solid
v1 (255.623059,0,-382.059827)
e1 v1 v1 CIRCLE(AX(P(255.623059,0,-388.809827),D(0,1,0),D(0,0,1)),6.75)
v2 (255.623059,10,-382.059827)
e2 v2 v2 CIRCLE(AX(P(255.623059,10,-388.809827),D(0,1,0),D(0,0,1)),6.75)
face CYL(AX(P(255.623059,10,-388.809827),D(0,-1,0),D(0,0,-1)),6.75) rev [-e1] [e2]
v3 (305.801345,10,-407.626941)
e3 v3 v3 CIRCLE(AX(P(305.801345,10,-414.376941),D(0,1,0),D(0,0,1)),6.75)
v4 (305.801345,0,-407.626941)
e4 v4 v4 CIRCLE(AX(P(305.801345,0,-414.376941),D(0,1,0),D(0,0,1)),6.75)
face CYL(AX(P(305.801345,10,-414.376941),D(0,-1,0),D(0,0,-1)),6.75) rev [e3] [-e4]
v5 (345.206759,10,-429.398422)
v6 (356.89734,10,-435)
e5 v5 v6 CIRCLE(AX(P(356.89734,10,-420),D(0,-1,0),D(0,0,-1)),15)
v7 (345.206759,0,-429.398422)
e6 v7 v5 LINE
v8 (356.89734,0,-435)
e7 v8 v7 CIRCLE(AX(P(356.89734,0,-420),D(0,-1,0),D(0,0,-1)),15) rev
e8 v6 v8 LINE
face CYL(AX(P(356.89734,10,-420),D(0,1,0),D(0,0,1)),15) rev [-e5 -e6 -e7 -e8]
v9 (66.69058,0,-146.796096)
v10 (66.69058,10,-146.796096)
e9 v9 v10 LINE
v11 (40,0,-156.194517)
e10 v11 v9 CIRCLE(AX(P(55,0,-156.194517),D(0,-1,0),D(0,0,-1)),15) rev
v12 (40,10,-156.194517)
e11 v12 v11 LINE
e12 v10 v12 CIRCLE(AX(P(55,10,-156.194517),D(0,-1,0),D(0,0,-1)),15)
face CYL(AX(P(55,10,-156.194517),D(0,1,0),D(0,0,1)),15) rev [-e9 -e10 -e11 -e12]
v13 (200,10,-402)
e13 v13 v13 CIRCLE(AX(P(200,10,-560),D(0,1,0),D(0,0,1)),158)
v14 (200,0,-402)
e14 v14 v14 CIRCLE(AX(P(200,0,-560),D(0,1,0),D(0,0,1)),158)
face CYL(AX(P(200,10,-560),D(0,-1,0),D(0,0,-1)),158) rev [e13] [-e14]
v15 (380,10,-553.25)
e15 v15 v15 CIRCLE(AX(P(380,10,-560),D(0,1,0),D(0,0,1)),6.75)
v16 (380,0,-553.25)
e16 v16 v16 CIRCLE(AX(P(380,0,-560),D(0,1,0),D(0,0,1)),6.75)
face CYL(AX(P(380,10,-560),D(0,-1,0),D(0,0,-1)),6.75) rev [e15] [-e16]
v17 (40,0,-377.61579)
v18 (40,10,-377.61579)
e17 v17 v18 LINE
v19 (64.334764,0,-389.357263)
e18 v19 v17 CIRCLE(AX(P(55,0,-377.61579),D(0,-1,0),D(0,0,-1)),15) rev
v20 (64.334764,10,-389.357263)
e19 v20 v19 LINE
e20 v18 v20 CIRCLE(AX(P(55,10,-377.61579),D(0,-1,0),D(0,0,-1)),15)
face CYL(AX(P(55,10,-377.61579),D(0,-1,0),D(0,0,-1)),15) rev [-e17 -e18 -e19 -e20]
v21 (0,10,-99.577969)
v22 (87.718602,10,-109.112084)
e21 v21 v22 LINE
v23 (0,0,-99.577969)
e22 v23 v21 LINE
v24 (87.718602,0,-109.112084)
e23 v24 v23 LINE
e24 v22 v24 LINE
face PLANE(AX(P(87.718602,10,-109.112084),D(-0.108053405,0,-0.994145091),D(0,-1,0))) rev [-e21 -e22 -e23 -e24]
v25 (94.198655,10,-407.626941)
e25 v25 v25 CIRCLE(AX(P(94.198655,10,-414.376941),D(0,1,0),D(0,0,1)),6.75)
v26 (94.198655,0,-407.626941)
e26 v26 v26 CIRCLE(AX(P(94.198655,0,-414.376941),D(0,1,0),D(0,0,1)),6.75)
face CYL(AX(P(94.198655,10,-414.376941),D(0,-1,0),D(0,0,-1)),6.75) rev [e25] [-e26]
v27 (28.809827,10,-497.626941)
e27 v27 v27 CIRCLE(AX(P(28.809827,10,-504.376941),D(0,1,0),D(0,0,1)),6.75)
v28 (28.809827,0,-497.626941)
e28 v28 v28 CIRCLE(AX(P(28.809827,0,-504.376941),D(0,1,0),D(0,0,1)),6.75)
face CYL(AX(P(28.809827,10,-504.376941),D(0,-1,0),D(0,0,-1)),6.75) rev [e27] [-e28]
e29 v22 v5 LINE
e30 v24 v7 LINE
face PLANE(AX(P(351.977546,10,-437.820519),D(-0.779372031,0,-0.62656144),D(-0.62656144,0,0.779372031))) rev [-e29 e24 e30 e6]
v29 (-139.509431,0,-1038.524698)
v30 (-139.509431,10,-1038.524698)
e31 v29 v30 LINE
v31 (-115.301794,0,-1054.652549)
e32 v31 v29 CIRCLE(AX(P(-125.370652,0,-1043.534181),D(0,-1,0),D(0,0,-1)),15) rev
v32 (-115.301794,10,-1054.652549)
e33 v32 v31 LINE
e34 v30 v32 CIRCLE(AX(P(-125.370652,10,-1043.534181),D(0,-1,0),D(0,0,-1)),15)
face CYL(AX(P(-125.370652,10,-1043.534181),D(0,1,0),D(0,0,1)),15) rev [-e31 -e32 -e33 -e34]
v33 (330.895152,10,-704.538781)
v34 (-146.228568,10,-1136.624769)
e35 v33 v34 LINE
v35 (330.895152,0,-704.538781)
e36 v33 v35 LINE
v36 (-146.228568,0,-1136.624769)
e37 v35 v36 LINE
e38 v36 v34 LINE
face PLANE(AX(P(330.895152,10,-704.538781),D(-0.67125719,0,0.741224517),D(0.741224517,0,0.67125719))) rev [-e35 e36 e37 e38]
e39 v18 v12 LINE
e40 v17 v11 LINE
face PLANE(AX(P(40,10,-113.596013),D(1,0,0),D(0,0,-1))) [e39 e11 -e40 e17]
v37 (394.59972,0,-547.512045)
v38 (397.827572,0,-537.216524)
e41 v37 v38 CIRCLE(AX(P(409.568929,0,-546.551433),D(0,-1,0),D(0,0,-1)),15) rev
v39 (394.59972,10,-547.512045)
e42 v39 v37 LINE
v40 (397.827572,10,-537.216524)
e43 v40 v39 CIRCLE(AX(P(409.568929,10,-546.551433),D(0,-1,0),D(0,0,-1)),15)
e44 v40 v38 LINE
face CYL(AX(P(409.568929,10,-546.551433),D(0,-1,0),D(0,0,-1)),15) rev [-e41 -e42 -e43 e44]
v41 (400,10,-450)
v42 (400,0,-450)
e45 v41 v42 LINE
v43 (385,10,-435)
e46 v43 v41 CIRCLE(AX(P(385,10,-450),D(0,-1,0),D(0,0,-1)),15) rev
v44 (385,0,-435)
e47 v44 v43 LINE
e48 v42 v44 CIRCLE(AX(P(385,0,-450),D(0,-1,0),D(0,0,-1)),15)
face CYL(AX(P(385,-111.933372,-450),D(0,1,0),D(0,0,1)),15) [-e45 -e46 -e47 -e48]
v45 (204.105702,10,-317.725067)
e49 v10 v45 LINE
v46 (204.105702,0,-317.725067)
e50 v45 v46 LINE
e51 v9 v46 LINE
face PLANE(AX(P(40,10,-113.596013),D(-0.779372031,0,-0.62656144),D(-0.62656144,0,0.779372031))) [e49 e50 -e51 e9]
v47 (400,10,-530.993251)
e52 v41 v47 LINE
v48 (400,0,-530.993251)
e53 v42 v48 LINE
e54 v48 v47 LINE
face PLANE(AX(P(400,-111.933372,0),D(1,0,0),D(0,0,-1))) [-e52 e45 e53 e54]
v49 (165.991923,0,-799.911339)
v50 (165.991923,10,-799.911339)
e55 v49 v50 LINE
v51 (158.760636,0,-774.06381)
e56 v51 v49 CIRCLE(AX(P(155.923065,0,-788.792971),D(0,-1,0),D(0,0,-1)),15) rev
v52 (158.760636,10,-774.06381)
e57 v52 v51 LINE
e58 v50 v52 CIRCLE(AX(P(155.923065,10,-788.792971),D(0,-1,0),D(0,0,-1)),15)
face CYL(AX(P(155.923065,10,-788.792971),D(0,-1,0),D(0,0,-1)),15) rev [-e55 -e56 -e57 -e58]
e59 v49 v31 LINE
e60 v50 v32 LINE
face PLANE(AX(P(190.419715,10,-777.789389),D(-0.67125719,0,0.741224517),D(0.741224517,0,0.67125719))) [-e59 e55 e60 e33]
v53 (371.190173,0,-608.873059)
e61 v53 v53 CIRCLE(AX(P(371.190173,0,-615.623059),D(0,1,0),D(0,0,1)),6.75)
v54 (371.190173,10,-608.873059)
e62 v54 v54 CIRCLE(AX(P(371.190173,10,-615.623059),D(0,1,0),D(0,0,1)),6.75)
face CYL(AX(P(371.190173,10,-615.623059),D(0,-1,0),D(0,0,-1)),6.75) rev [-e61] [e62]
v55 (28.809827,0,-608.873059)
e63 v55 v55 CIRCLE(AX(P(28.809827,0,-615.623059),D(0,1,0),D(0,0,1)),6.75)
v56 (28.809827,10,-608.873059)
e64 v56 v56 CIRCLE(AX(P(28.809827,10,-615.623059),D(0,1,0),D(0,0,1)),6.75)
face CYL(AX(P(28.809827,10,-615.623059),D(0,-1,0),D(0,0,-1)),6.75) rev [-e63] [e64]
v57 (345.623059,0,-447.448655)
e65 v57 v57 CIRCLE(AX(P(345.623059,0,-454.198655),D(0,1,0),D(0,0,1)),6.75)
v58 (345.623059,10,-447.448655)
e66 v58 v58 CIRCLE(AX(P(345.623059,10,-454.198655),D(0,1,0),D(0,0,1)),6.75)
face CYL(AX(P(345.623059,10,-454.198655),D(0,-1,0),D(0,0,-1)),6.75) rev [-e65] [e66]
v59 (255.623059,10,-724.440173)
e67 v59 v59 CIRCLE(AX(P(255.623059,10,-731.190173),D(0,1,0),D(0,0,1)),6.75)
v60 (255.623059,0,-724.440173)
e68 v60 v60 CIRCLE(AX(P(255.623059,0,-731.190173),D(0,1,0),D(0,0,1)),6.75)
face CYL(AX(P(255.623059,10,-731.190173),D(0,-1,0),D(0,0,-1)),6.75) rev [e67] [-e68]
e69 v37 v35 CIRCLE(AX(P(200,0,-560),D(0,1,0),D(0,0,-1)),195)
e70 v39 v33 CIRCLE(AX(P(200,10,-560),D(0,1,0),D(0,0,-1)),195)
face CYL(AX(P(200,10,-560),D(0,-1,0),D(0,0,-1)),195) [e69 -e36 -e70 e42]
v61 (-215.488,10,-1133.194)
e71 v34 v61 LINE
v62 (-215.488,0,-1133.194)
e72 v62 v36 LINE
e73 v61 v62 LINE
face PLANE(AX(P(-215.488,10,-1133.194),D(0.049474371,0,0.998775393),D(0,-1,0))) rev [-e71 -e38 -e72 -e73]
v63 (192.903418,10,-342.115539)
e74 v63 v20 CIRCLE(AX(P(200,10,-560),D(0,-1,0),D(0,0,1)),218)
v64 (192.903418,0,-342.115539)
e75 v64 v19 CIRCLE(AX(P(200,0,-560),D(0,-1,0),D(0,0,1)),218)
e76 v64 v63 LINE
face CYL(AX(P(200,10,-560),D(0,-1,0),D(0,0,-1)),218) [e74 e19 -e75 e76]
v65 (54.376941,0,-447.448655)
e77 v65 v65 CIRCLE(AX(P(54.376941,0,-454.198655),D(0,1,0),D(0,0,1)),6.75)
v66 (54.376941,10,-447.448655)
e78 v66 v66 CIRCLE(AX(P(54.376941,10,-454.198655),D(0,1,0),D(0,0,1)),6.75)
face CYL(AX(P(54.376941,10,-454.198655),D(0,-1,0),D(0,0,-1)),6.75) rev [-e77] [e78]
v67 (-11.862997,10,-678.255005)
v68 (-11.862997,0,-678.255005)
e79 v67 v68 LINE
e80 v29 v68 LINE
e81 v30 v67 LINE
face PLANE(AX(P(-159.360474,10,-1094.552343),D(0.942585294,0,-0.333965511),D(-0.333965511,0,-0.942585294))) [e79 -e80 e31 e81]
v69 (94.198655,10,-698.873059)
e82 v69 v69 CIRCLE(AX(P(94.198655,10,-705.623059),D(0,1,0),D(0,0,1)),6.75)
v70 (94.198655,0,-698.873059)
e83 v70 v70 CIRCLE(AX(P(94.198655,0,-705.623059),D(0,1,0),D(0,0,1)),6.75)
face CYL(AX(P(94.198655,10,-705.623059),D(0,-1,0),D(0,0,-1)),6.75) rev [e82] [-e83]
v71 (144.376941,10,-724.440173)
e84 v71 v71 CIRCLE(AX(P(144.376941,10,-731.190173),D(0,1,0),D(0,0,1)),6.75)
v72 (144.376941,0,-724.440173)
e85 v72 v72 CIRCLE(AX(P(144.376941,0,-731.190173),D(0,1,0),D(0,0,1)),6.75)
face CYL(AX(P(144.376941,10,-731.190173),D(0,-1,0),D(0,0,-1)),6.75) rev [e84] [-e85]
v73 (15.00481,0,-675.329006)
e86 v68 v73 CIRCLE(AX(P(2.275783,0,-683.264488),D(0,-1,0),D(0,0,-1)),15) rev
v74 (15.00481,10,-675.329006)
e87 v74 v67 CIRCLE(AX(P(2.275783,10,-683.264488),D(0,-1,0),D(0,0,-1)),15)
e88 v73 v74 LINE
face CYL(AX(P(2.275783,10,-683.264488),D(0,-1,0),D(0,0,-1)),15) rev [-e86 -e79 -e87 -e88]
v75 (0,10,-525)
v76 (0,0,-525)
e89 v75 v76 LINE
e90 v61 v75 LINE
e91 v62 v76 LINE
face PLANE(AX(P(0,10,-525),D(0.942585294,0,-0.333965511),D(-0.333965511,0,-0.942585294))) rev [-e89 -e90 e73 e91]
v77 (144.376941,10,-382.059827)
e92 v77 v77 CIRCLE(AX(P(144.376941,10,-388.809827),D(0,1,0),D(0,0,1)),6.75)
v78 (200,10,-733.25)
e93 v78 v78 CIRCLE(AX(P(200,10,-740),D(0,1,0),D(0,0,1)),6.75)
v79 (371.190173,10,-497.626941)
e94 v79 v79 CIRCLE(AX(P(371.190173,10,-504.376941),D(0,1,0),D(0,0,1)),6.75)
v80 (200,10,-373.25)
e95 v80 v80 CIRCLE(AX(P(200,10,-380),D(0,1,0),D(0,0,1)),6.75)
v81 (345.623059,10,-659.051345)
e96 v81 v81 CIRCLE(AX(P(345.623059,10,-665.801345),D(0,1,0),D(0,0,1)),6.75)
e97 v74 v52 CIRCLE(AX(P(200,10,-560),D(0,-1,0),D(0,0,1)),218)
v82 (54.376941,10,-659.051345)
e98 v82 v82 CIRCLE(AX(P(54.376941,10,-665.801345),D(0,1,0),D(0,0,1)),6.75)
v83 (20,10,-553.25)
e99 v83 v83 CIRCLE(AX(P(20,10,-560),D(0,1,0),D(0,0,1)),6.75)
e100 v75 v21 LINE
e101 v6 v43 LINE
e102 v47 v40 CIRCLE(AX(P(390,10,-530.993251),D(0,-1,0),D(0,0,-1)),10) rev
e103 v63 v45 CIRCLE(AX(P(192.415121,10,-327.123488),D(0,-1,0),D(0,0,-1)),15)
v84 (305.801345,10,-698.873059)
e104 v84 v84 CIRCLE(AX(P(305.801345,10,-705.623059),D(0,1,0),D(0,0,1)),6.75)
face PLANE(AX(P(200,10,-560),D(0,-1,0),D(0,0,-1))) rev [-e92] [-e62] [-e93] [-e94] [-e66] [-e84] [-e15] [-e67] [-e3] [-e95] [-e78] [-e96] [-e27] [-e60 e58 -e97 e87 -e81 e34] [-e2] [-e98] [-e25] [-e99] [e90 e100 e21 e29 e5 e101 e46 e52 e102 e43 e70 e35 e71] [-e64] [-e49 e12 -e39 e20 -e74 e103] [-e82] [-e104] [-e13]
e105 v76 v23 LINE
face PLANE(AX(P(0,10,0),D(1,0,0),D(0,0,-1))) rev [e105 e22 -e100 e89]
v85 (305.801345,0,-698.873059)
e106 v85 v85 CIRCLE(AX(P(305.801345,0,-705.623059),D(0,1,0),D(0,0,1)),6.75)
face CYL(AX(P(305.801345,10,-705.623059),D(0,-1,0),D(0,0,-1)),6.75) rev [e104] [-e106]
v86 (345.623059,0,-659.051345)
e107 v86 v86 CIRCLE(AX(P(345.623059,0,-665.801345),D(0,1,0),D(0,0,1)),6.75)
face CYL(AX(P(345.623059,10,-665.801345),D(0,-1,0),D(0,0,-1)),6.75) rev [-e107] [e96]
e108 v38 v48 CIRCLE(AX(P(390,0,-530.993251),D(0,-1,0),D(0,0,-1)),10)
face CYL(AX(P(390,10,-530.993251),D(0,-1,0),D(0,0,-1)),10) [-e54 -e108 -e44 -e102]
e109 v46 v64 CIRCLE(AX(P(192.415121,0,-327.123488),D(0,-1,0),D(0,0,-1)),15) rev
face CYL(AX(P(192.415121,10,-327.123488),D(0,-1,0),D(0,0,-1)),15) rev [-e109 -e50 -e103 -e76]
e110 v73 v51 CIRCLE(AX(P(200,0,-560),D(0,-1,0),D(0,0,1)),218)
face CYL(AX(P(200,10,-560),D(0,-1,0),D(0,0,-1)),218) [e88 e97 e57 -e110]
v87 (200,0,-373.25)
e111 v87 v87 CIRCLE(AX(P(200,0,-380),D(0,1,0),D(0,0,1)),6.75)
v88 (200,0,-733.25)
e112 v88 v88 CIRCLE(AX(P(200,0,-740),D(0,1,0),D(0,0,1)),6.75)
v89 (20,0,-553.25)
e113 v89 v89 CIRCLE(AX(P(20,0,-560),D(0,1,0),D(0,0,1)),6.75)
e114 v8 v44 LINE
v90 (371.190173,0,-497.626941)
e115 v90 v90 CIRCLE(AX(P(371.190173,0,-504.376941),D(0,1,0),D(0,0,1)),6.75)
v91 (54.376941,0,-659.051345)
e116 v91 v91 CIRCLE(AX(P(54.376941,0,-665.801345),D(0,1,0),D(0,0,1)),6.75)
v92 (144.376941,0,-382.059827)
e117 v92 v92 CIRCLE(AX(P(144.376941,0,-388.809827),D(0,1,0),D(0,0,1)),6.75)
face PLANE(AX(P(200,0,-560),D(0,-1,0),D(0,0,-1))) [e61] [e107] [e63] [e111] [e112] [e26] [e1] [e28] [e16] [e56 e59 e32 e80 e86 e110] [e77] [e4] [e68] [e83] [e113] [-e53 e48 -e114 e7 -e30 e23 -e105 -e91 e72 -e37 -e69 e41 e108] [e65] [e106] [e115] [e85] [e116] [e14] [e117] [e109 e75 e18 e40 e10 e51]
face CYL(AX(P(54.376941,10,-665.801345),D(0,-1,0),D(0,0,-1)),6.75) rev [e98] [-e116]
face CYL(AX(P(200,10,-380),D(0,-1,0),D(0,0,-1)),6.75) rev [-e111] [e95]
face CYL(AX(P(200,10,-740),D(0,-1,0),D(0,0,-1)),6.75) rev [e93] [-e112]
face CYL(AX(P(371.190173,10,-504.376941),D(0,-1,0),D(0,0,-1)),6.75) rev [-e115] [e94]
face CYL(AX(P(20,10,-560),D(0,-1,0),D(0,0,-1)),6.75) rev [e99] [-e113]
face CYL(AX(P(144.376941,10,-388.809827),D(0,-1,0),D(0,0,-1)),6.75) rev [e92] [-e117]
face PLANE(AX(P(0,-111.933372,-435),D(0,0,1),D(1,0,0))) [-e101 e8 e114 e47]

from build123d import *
from OCP.BRepFilletAPI import BRepFilletAPI_MakeChamfer

# Parameters (mm, degrees)
ESQUISSE2_R        = 6.75
ESQUISSE2_R_2      = 158
BOSS_EXTRU_1_DEPTH = 10
BOSS_EXTRU_2_DEPTH = 10
CONG_1_R           = 15
CHANFREIN1_SIZE    = 140
CHANFREIN1_SIZE2   = 99.577969333
CHANFREIN1_SIZE2_2 = 103.340011173
CONG_2_R           = 10


with BuildPart() as part:
    # Esquisse2 → Boss.-Extru.1 (new body)
    with BuildSketch(Plane(origin=(0, 0, 0), x_dir=(1, 0, 0), z_dir=(0, 1, 0))):
        with BuildLine():
            Line((0, 0), (0, 525))
            Line((0, 525), (-250, 1230.600775194))
            Line((-250, 1230.600775194), (330.895152108, 704.538780798))
            ThreePointArc((330.895152108, 704.538780798), (394.393669115, 575.365591696), (351.977546011, 437.820519282))
            Line((351.977546011, 437.820519282), (0, 0))
        make_face()
        with Locations(Location((200, 380, 0), (0, 0, 270))):
            Circle(ESQUISSE2_R, mode=Mode.SUBTRACT)
        with Locations(Location((144.376941013, 388.809827067, 0), (0, 0, 270))):
            Circle(ESQUISSE2_R, mode=Mode.SUBTRACT)
        with Locations(Location((94.198654587, 414.376941013, 0), (0, 0, 270))):
            Circle(ESQUISSE2_R, mode=Mode.SUBTRACT)
        with Locations(Location((54.376941013, 454.198654587, 0), (0, 0, 270))):
            Circle(ESQUISSE2_R, mode=Mode.SUBTRACT)
        with Locations(Location((28.809827067, 504.376941013, 0), (0, 0, 270))):
            Circle(ESQUISSE2_R, mode=Mode.SUBTRACT)
        with Locations(Location((20, 560, 0), (0, 0, 270))):
            Circle(ESQUISSE2_R, mode=Mode.SUBTRACT)
        with Locations(Location((28.809827067, 615.623058987, 0), (0, 0, 270))):
            Circle(ESQUISSE2_R, mode=Mode.SUBTRACT)
        with Locations(Location((54.376941013, 665.801345413, 0), (0, 0, 270))):
            Circle(ESQUISSE2_R, mode=Mode.SUBTRACT)
        with Locations(Location((94.198654587, 705.623058987, 0), (0, 0, 270))):
            Circle(ESQUISSE2_R, mode=Mode.SUBTRACT)
        with Locations(Location((144.376941013, 731.190172933, 0), (0, 0, 270))):
            Circle(ESQUISSE2_R, mode=Mode.SUBTRACT)
        with Locations(Location((200, 740, 0), (0, 0, 270))):
            Circle(ESQUISSE2_R, mode=Mode.SUBTRACT)
        with Locations(Location((255.623058987, 731.190172933, 0), (0, 0, 270))):
            Circle(ESQUISSE2_R, mode=Mode.SUBTRACT)
        with Locations(Location((305.801345413, 705.623058987, 0), (0, 0, 270))):
            Circle(ESQUISSE2_R, mode=Mode.SUBTRACT)
        with Locations(Location((345.623058987, 665.801345413, 0), (0, 0, 270))):
            Circle(ESQUISSE2_R, mode=Mode.SUBTRACT)
        with Locations(Location((371.190172933, 615.623058987, 0), (0, 0, 270))):
            Circle(ESQUISSE2_R, mode=Mode.SUBTRACT)
        with Locations(Location((380, 560, 0), (0, 0, 270))):
            Circle(ESQUISSE2_R, mode=Mode.SUBTRACT)
        with Locations(Location((371.190172933, 504.376941013, 0), (0, 0, 270))):
            Circle(ESQUISSE2_R, mode=Mode.SUBTRACT)
        with Locations(Location((345.623058987, 454.198654587, 0), (0, 0, 270))):
            Circle(ESQUISSE2_R, mode=Mode.SUBTRACT)
        with Locations(Location((305.801345413, 414.376941013, 0), (0, 0, 270))):
            Circle(ESQUISSE2_R, mode=Mode.SUBTRACT)
        with Locations(Location((255.623058987, 388.809827067, 0), (0, 0, 270))):
            Circle(ESQUISSE2_R, mode=Mode.SUBTRACT)
        with Locations(Location((200, 560, 0), (0, 0, 270))):
            Circle(ESQUISSE2_R_2, mode=Mode.SUBTRACT)
        with BuildLine():
            Line((40, 113.596012676), (40, 411.932447849))
            ThreePointArc((40, 411.932447849), (124.193302514, 355.604930059), (224.754658533, 343.410048984))
            Line((224.754658533, 343.410048984), (40, 113.596012676))
        make_face(mode=Mode.SUBTRACT)
        with BuildLine():
            Line((190.419715338, 777.789389424), (-159.36047406, 1094.552342888))
            Line((-159.36047406, 1094.552342888), (-0.382744379, 645.853105682))
            ThreePointArc((-0.382744379, 645.853105682), (76.012443637, 739.307238747), (190.419715338, 777.789389424))
        make_face(mode=Mode.SUBTRACT)
    extrude(amount=BOSS_EXTRU_1_DEPTH)

    # Esquisse4 → Boss.-Extru.2 (add)
    with BuildSketch(Plane(origin=(0, 10, 0), x_dir=(1, 0, 0), z_dir=(0, 1, 0))):
        Polygon((349.666295471, 435), (400, 435), (400, 535), (393.390796058, 535), align=None)
    extrude(amount=-BOSS_EXTRU_2_DEPTH)

    # Congé1
    # the kernel refuses this fillet: 15 mm, written as the material it adds along each edge
    with BuildSketch(Plane(origin=(40, 0, -113.596012676), x_dir=(0, 0, -1), z_dir=(0, 1, 0))) as cong_1_piece_1:
        with BuildLine():
            CenterArc((CONG_1_R * 2.83990031691, -CONG_1_R), CONG_1_R, 90, 141.203115043)
            Line((CONG_1_R * 2.21333887733, -CONG_1_R * 1.77937203082), (0, 0))
            Line((0, 0), (CONG_1_R * 2.83990031691, 0))
        make_face()
    extrude(amount=10)
    with BuildSketch(Plane(origin=(224.754658533, 0, -343.410048984), x_dir=(-0.9991751199955, 0, 0.040608860880086604), z_dir=(0, 1, 0))) as cong_1_piece_2:
        with BuildLine():
            CenterArc((32.974239643, 14.959854274), CONG_1_R, 138.875758739, 126.931398571)
            Line((21.674961702, 24.825264453), (0, 0))
            ThreePointArc((0, 0), (15.938767721, 0.58345122), (31.877535442, 0))
        make_face()
    extrude(amount=10)
    with BuildSketch(Plane(origin=(40, 0, -411.932447849), x_dir=(0.7331146005810171, 0, 0.6801051260025437), z_dir=(0, 1, 0))) as cong_1_piece_3:
        with BuildLine():
            CenterArc((34.335653812, -14.956465907), CONG_1_R, 94.366282627, 128.48557588)
            Line((23.338934803, -25.158042797), (0, 0))
            ThreePointArc((0, 0), (16.59683488, -0.632695485), (33.193669761, 0))
        make_face()
    extrude(amount=10)
    with BuildSketch(Plane(origin=(-0.382744379, 0, -645.853105682), x_dir=(0.4627745806888944, 0, -0.8864759937348659), z_dir=(0, 1, 0))) as cong_1_piece_4:
        with BuildLine():
            CenterArc((34.394590931, 14.956316108), CONG_1_R, 137.075935051, 128.550273023)
            Line((23.410737088, 25.1717434), (0, 0))
            ThreePointArc((0, 0), (16.625323332, 0.634872567), (33.250646665, 0))
        make_face()
    extrude(amount=10)
    with BuildSketch(Plane(origin=(190.419715338, 0, -777.789389424), x_dir=(-0.9931470305035408, 0, 0.11687162102922555), z_dir=(0, 1, 0))) as cong_1_piece_5:
        with BuildLine():
            CenterArc((32.974239643, -14.959854274), CONG_1_R, 94.19284269, 126.931398571)
            Line((21.674961702, -24.825264453), (0, 0))
            ThreePointArc((0, 0), (15.938767721, -0.58345122), (31.877535442, 0))
        make_face()
    extrude(amount=10)
    with BuildSketch(Plane(origin=(-159.36047406, 0, -1094.552342888), x_dir=(0.3339655112300271, 0, 0.942585294447599), z_dir=(0, 1, 0))) as cong_1_piece_6:
        with BuildLine():
            CenterArc((CONG_1_R * 3.96269318106, CONG_1_R), CONG_1_R, 118.326186848, 151.673813152)
            Line((CONG_1_R * 3.48820260226, CONG_1_R * 1.88026058109), (0, 0))
            Line((0, 0), (CONG_1_R * 3.96269318106, 0))
        make_face()
    extrude(amount=10)
    with BuildSketch(Plane(origin=(393.390796058, 10, -535), x_dir=(1, 0, 0), z_dir=(0, -1, 0))) as cong_1_piece_7:
        with BuildLine():
            CenterArc((16.178133023, -11.551432649), CONG_1_R, 129.637533665, 54.034246436)
            ThreePointArc((1.208923803, -12.512044602), (0.705308812, -6.246278392), (0, 0))
            Line((0, 0), (6.609203942, 0))
        make_face()
    extrude(amount=10)
    with BuildSketch(Plane(origin=(349.71004275, 10, -435), x_dir=(1, 0, 0), z_dir=(0, -1, 0))) as cong_1_piece_8:
        with BuildLine():
            CenterArc((CONG_1_R * 0.479153145931, CONG_1_R), CONG_1_R, 218.796884957, 51.203115043)
            Line((-CONG_1_R * 0.300218884894, CONG_1_R * 0.37343856042), (0, 0))
            Line((0, 0), (CONG_1_R * 0.479153145931, 0))
        make_face()
    extrude(amount=10)
    # the kernel refuses this fillet: 15 mm, written as the material it takes off along each edge
    with BuildSketch(Plane(origin=(400, 47.5, -435), x_dir=(0, 0, -1), z_dir=(0, -1, 0))) as cong_1_2_piece_1:
        with BuildLine():
            CenterArc((CONG_1_R, -CONG_1_R), CONG_1_R, 90, 90)
            Line((0, -CONG_1_R), (0, 0))
            Line((0, 0), (CONG_1_R, 0))
        make_face()
    extrude(amount=85, mode=Mode.SUBTRACT)

    # Chanfrein1: one chamfer whose edges measure the first distance from different faces: ONE call of the kernel's chamfer builder (chamfer() names one face for all edges)
    chanfrein1_edges_1 = [part.edges().sort_by_distance(p)[0] for p in [
        (0, 5, 0),
    ]]
    chanfrein1_side_1 = [part.faces().sort_by_distance(p)[0] for p in [
        (172.603379738, 5, -214.699210797),
    ]]
    chanfrein1_edges_2 = [part.edges().sort_by_distance(p)[0] for p in [
        (-250, 5, -1230.600775194),
    ]]
    chanfrein1_side_2 = [part.faces().sort_by_distance(p)[0] for p in [
        (40.447576054, 5, -967.569777996),
    ]]
    chanfrein1 = BRepFilletAPI_MakeChamfer(part.part.solid().wrapped)
    for e in chanfrein1_edges_1:
        chanfrein1.Add(CHANFREIN1_SIZE, CHANFREIN1_SIZE2, e.wrapped, chanfrein1_side_1[0].wrapped)  # the first distance lies on this face
    for e in chanfrein1_edges_2:
        chanfrein1.Add(CHANFREIN1_SIZE, CHANFREIN1_SIZE2_2, e.wrapped, chanfrein1_side_2[0].wrapped)  # the first distance lies on this face
    add(Compound.cast(chanfrein1.Shape()), mode=Mode.REPLACE)

    # Congé2
    cong_2_edges = [part.edges().sort_by_distance(p)[0] for p in [
        (400, 5, -535),
    ]]
    fillet(cong_2_edges, radius=CONG_2_R)


solid = part.part
